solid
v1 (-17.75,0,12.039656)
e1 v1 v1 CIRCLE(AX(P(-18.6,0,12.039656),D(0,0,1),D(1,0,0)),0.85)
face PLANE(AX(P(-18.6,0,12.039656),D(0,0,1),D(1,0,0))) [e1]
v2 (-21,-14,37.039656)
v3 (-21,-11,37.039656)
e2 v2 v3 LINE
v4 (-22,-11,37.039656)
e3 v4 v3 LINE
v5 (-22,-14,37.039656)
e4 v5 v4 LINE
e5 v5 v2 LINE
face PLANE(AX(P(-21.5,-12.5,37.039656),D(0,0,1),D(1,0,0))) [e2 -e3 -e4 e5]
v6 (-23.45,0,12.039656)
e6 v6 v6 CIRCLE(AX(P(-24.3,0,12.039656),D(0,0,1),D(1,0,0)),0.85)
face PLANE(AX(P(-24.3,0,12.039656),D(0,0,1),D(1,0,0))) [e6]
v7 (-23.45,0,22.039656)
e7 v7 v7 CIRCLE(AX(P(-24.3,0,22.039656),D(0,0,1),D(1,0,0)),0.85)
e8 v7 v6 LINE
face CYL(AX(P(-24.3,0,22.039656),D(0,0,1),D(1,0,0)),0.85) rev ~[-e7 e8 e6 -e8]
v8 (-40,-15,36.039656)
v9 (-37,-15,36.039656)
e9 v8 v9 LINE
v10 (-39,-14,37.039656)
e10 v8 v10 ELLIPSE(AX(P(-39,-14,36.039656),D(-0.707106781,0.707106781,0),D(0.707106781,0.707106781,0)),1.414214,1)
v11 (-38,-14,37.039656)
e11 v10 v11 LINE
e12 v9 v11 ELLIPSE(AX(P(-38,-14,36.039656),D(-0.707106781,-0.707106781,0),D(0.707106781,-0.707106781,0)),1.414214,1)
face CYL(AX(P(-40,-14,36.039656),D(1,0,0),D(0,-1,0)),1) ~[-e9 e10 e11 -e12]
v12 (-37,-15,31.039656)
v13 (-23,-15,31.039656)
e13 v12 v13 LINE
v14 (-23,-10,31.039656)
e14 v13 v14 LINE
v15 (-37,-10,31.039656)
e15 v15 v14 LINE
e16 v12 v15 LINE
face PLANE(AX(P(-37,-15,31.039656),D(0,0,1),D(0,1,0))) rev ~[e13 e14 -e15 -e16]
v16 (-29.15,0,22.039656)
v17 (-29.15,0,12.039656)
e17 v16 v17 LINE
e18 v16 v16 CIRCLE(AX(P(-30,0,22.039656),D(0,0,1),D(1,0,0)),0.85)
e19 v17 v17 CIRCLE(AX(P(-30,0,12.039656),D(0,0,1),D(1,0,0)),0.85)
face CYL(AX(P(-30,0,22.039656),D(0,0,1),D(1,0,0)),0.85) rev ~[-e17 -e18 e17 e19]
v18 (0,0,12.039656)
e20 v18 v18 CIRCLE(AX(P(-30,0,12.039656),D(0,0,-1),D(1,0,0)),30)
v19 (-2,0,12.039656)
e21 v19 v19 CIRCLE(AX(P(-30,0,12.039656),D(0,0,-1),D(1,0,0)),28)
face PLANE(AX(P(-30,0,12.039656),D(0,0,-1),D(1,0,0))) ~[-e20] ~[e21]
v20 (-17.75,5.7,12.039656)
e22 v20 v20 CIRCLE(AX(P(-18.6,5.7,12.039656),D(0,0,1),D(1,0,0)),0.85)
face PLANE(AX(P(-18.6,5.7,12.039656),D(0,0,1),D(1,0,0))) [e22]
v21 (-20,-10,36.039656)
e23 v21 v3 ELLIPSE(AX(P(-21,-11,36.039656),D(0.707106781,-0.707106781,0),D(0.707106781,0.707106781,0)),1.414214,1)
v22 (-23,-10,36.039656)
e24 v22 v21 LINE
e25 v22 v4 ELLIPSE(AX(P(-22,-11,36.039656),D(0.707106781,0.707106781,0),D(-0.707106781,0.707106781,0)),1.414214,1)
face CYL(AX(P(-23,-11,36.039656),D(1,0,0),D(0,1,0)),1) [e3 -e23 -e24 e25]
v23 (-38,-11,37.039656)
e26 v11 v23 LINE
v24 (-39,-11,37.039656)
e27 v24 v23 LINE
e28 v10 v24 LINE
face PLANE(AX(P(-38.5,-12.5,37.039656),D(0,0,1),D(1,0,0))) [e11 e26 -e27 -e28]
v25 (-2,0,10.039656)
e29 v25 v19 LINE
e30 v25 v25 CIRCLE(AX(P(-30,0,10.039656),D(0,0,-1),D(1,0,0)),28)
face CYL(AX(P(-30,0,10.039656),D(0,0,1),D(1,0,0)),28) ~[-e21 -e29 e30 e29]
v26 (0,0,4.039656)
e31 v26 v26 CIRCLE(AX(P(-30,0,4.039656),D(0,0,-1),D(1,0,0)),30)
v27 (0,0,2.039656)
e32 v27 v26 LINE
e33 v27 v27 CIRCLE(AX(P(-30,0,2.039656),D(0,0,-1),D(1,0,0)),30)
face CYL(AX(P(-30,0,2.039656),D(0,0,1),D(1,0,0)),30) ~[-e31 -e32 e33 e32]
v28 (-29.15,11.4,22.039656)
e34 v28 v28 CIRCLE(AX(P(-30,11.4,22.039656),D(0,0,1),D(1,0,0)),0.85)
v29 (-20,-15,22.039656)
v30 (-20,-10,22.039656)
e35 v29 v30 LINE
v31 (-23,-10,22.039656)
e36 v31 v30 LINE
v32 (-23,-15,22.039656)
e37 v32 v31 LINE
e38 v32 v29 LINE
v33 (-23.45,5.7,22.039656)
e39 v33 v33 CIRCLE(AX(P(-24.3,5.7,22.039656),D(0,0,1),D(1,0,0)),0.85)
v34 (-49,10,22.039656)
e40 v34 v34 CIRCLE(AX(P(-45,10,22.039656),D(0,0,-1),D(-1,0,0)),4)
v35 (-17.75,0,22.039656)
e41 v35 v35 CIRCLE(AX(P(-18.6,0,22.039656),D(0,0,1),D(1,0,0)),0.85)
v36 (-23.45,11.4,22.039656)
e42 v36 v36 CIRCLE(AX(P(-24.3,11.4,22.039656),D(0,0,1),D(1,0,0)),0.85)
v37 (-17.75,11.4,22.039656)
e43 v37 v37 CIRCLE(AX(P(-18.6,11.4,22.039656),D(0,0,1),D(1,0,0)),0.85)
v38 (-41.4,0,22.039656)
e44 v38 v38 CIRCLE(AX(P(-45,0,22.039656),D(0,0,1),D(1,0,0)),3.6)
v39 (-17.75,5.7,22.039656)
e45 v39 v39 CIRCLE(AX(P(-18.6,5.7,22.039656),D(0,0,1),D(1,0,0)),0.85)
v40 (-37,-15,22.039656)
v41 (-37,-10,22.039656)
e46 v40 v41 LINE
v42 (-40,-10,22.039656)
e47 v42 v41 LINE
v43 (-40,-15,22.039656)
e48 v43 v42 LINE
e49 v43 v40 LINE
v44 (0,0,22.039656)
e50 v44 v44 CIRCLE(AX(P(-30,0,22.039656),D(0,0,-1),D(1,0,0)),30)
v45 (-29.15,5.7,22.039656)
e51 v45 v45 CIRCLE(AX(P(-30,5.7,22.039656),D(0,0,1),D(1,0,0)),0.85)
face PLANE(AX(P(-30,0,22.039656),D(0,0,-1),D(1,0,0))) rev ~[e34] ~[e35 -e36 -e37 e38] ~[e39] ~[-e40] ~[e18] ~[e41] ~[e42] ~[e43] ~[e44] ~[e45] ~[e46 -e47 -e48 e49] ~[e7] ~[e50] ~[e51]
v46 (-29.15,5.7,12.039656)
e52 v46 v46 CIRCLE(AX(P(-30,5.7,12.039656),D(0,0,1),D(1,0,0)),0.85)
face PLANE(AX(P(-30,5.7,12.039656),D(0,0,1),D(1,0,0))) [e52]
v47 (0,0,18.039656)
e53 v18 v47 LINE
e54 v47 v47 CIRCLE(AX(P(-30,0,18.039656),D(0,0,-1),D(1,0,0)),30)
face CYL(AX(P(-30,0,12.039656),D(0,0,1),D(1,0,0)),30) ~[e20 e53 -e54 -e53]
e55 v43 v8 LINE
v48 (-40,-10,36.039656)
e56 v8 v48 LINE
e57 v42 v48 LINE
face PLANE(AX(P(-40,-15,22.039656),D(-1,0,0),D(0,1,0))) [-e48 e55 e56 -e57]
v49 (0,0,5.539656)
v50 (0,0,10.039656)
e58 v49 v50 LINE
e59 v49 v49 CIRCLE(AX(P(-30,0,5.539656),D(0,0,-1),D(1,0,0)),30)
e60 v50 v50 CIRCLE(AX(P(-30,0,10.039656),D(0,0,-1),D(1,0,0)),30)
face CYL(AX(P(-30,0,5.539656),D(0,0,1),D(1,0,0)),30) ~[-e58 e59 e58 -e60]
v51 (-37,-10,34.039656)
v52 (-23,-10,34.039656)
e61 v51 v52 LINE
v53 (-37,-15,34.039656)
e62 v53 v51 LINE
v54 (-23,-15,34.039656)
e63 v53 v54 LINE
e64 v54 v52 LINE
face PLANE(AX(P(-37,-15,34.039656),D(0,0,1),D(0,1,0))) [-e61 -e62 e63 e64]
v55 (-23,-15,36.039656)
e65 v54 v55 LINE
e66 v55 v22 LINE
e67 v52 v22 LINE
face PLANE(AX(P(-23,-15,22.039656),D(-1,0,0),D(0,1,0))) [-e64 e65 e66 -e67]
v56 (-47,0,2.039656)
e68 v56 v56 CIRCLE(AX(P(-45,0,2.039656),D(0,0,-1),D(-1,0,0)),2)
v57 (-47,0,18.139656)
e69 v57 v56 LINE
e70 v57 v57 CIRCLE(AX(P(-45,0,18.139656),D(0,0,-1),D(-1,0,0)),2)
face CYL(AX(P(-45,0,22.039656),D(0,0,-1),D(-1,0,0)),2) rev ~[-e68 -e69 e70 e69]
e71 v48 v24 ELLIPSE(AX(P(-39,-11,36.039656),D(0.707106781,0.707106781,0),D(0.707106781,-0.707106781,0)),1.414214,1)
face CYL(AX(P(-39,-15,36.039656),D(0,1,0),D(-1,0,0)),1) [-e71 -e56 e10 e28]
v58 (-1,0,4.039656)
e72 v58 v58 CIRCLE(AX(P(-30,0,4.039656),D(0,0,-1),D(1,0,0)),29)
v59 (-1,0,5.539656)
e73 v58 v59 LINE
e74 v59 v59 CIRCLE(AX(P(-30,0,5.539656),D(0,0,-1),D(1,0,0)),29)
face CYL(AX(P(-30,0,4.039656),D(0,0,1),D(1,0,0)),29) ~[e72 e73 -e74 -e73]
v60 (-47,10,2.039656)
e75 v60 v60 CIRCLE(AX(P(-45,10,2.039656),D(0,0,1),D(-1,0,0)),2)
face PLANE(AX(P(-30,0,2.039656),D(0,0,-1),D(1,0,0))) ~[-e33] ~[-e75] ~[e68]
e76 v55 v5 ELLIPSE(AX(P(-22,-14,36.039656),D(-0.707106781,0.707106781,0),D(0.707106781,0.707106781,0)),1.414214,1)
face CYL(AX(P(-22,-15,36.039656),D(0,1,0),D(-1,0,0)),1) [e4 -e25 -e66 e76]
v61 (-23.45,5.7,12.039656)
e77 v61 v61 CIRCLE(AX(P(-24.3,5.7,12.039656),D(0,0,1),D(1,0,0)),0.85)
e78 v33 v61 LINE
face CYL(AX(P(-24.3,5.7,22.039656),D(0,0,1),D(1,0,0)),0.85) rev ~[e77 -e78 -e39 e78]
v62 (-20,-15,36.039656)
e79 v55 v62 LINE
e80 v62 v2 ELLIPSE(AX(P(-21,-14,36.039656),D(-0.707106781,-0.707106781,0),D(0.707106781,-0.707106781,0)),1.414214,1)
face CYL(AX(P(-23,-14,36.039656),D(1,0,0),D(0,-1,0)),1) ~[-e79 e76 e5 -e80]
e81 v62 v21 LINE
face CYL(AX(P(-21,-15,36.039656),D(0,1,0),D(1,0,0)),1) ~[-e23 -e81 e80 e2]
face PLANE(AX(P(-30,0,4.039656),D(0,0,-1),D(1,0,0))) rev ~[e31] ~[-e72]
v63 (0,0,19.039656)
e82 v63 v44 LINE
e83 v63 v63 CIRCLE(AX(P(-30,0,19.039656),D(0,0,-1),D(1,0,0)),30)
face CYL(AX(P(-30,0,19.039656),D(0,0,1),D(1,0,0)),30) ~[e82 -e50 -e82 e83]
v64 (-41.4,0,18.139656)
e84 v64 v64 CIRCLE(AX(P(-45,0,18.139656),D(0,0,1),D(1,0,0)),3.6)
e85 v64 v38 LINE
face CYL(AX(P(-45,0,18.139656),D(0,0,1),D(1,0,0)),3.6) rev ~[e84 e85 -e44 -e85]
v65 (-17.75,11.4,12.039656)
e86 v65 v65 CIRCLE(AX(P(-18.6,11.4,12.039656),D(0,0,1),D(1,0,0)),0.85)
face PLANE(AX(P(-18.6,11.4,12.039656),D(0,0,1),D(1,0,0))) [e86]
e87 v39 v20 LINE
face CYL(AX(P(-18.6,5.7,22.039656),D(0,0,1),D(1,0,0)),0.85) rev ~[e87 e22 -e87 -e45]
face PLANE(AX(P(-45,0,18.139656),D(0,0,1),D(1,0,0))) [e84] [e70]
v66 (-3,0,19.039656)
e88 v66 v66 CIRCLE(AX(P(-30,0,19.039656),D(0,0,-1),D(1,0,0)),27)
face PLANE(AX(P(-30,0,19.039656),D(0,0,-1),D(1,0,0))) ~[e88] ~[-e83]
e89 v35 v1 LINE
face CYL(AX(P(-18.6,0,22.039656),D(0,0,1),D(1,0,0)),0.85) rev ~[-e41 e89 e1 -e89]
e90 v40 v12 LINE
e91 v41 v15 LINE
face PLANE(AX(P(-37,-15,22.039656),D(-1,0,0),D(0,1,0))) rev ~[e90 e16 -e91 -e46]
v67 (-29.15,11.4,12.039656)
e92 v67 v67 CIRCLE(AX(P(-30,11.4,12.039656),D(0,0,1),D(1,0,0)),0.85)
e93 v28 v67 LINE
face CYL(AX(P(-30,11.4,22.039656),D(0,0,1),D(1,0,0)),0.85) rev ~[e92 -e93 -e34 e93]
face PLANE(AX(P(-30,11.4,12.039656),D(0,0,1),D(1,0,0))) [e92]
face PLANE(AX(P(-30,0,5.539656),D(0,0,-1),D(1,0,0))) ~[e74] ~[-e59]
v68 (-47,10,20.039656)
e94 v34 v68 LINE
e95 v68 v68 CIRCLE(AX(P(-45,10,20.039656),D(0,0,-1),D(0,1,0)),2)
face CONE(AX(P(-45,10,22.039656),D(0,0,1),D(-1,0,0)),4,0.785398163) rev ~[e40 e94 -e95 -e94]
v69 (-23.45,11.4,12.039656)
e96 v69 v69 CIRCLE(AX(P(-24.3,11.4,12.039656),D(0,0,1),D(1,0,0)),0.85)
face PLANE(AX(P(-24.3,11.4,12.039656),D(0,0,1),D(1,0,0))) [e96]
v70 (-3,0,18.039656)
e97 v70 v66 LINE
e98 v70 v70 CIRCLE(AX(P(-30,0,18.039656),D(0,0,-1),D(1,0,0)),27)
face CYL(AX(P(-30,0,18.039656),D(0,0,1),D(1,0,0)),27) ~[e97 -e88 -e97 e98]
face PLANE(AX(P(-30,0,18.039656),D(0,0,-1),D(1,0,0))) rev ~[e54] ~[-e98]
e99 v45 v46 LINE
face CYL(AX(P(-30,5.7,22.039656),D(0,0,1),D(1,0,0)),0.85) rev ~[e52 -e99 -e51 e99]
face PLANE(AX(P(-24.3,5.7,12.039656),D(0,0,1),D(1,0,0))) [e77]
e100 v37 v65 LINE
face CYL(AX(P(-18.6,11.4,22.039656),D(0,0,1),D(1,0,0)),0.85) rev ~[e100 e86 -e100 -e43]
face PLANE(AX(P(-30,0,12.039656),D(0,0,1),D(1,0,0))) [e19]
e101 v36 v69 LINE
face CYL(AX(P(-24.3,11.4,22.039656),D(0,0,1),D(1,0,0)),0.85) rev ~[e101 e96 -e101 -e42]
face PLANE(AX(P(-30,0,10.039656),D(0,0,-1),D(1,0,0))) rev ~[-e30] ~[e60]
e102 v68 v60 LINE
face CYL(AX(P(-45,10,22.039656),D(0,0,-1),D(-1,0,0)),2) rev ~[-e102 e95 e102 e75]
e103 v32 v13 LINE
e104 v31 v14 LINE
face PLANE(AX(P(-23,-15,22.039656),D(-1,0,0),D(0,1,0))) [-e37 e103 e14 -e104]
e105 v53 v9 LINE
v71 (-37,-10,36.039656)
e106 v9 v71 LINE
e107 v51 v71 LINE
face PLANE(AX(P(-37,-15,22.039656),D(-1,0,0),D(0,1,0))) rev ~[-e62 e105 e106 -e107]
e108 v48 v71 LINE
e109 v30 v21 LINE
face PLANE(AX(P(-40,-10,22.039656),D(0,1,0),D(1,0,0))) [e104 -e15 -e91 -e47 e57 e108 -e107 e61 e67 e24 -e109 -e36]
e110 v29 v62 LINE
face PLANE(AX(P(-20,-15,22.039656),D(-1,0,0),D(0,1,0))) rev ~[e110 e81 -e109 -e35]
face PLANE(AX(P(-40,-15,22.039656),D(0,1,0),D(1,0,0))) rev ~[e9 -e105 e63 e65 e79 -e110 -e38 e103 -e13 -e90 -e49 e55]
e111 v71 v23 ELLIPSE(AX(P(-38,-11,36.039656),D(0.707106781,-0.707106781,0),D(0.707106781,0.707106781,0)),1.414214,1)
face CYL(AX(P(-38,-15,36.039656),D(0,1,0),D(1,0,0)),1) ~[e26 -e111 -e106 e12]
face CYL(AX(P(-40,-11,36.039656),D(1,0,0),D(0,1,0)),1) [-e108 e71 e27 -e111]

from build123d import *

# Parameters (mm, degrees)
F2_R           = 0.85
F3_DEPTH       = 10
F2_W           = 3
F2_H           = 5
F4_DEPTH       = 15
F6_R           = 1
F7_D           = 4
F7_CBORE_D     = 7.2
F7_CBORE_DEPTH = 3.9
F8_D           = 4
F8_DEPTH       = 20
F8_CSINK_D     = 8
F8_CSINK_ANGLE = 90
F8_TIP         = 1.2017212381
F5_W           = 5
F5_H           = 3
F9_DEPTH       = 14


# Not quite as in the source:
# - a feature of the source that left no trace in its solid (it failed there, or was rolled back) is left out


with BuildPart() as f1:
    # F0 (on Front) → F1 (revolve)
    with BuildSketch(Plane.XZ):
        Polygon((0, 22.0396561921), (-30, 22.0396561921), (-30, 2.0396561921), (0, 2.0396561921), (0, 4.0396561921), (-1, 4.0396561921), (-1, 5.5396561921), (0, 5.5396561921), (0, 10.0396561921), (-2, 10.0396561921), (-2, 12.0396561921), (0, 12.0396561921), (0, 18.0396561921), (-3, 18.0396561921), (-3, 19.0396561921), (0, 19.0396561921), align=None)
    revolve(axis=Axis((-30, 0, 12.0396561921), (0, 0, -1)))

    # F2 (on face) → F3 (cut)
    with BuildSketch(Plane.XY.offset(22.0396561921)):
        with BuildLine():
            ThreePointArc((-30.85, 0), (-30, -0.85), (-29.15, 0))
            ThreePointArc((-29.15, 0), (-30, 0.85), (-30.85, 0))
        make_face()
        with Locations((-30, 5.7)):
            Circle(F2_R)
        with Locations((-30, 11.4)):
            Circle(F2_R)
        with Locations((-24.3, 0)):
            Circle(F2_R)
        with Locations((-24.3, 5.7)):
            Circle(F2_R)
        with Locations((-24.3, 11.4)):
            Circle(F2_R)
        with Locations((-18.6, 0)):
            Circle(F2_R)
        with Locations((-18.6, 5.7)):
            Circle(F2_R)
        with Locations((-18.6, 11.4)):
            Circle(F2_R)
    extrude(amount=-F3_DEPTH, mode=Mode.SUBTRACT)

    # F2 (on face) → F4 (join)
    with BuildSketch(Plane.XY.offset(22.0396561921)):
        with Locations((-21.5, -12.5)):
            Rectangle(F2_W, F2_H)
        with Locations((-38.5, -12.5)):
            Rectangle(F2_W, F2_H)
    extrude(amount=F4_DEPTH)

    # F6
    f6_edges = [f1.edges().sort_by_distance(p)[0] for p in [
        (-38.5, -10, 37.039656),
        (-40, -12.5, 37.039656),
        (-38.5, -15, 37.039656),
        (-37, -12.5, 37.039656),
        (-23, -12.5, 37.039656),
        (-21.5, -15, 37.039656),
        (-20, -12.5, 37.039656),
        (-21.5, -10, 37.039656),
    ]]
    fillet(f6_edges, radius=F6_R)

    # F7 (through all)
    with Locations(Plane.XY.offset(22.0396561921)):
        with Locations((-45, 0)):
            CounterBoreHole(F7_D / 2, F7_CBORE_D / 2, F7_CBORE_DEPTH)

    # F8
    with Locations(Plane.XY.offset(22.0396561921)):
        with Locations((-45, 10)):
            CounterSinkHole(F8_D / 2, F8_CSINK_D / 2, depth=F8_DEPTH, counter_sink_angle=F8_CSINK_ANGLE)
            with Locations((0, 0, -(F8_DEPTH + F8_TIP / 2))):  # 118° drill point
                Cone(0, F8_D / 2, F8_TIP, mode=Mode.SUBTRACT)

    # F5 (on face) → F9 (join)
    with BuildSketch(Plane.YZ.offset(-37)):
        with Locations((-12.5, 32.5396561921)):
            Rectangle(F5_W, F5_H)
    extrude(amount=F9_DEPTH)


solid = f1.part
